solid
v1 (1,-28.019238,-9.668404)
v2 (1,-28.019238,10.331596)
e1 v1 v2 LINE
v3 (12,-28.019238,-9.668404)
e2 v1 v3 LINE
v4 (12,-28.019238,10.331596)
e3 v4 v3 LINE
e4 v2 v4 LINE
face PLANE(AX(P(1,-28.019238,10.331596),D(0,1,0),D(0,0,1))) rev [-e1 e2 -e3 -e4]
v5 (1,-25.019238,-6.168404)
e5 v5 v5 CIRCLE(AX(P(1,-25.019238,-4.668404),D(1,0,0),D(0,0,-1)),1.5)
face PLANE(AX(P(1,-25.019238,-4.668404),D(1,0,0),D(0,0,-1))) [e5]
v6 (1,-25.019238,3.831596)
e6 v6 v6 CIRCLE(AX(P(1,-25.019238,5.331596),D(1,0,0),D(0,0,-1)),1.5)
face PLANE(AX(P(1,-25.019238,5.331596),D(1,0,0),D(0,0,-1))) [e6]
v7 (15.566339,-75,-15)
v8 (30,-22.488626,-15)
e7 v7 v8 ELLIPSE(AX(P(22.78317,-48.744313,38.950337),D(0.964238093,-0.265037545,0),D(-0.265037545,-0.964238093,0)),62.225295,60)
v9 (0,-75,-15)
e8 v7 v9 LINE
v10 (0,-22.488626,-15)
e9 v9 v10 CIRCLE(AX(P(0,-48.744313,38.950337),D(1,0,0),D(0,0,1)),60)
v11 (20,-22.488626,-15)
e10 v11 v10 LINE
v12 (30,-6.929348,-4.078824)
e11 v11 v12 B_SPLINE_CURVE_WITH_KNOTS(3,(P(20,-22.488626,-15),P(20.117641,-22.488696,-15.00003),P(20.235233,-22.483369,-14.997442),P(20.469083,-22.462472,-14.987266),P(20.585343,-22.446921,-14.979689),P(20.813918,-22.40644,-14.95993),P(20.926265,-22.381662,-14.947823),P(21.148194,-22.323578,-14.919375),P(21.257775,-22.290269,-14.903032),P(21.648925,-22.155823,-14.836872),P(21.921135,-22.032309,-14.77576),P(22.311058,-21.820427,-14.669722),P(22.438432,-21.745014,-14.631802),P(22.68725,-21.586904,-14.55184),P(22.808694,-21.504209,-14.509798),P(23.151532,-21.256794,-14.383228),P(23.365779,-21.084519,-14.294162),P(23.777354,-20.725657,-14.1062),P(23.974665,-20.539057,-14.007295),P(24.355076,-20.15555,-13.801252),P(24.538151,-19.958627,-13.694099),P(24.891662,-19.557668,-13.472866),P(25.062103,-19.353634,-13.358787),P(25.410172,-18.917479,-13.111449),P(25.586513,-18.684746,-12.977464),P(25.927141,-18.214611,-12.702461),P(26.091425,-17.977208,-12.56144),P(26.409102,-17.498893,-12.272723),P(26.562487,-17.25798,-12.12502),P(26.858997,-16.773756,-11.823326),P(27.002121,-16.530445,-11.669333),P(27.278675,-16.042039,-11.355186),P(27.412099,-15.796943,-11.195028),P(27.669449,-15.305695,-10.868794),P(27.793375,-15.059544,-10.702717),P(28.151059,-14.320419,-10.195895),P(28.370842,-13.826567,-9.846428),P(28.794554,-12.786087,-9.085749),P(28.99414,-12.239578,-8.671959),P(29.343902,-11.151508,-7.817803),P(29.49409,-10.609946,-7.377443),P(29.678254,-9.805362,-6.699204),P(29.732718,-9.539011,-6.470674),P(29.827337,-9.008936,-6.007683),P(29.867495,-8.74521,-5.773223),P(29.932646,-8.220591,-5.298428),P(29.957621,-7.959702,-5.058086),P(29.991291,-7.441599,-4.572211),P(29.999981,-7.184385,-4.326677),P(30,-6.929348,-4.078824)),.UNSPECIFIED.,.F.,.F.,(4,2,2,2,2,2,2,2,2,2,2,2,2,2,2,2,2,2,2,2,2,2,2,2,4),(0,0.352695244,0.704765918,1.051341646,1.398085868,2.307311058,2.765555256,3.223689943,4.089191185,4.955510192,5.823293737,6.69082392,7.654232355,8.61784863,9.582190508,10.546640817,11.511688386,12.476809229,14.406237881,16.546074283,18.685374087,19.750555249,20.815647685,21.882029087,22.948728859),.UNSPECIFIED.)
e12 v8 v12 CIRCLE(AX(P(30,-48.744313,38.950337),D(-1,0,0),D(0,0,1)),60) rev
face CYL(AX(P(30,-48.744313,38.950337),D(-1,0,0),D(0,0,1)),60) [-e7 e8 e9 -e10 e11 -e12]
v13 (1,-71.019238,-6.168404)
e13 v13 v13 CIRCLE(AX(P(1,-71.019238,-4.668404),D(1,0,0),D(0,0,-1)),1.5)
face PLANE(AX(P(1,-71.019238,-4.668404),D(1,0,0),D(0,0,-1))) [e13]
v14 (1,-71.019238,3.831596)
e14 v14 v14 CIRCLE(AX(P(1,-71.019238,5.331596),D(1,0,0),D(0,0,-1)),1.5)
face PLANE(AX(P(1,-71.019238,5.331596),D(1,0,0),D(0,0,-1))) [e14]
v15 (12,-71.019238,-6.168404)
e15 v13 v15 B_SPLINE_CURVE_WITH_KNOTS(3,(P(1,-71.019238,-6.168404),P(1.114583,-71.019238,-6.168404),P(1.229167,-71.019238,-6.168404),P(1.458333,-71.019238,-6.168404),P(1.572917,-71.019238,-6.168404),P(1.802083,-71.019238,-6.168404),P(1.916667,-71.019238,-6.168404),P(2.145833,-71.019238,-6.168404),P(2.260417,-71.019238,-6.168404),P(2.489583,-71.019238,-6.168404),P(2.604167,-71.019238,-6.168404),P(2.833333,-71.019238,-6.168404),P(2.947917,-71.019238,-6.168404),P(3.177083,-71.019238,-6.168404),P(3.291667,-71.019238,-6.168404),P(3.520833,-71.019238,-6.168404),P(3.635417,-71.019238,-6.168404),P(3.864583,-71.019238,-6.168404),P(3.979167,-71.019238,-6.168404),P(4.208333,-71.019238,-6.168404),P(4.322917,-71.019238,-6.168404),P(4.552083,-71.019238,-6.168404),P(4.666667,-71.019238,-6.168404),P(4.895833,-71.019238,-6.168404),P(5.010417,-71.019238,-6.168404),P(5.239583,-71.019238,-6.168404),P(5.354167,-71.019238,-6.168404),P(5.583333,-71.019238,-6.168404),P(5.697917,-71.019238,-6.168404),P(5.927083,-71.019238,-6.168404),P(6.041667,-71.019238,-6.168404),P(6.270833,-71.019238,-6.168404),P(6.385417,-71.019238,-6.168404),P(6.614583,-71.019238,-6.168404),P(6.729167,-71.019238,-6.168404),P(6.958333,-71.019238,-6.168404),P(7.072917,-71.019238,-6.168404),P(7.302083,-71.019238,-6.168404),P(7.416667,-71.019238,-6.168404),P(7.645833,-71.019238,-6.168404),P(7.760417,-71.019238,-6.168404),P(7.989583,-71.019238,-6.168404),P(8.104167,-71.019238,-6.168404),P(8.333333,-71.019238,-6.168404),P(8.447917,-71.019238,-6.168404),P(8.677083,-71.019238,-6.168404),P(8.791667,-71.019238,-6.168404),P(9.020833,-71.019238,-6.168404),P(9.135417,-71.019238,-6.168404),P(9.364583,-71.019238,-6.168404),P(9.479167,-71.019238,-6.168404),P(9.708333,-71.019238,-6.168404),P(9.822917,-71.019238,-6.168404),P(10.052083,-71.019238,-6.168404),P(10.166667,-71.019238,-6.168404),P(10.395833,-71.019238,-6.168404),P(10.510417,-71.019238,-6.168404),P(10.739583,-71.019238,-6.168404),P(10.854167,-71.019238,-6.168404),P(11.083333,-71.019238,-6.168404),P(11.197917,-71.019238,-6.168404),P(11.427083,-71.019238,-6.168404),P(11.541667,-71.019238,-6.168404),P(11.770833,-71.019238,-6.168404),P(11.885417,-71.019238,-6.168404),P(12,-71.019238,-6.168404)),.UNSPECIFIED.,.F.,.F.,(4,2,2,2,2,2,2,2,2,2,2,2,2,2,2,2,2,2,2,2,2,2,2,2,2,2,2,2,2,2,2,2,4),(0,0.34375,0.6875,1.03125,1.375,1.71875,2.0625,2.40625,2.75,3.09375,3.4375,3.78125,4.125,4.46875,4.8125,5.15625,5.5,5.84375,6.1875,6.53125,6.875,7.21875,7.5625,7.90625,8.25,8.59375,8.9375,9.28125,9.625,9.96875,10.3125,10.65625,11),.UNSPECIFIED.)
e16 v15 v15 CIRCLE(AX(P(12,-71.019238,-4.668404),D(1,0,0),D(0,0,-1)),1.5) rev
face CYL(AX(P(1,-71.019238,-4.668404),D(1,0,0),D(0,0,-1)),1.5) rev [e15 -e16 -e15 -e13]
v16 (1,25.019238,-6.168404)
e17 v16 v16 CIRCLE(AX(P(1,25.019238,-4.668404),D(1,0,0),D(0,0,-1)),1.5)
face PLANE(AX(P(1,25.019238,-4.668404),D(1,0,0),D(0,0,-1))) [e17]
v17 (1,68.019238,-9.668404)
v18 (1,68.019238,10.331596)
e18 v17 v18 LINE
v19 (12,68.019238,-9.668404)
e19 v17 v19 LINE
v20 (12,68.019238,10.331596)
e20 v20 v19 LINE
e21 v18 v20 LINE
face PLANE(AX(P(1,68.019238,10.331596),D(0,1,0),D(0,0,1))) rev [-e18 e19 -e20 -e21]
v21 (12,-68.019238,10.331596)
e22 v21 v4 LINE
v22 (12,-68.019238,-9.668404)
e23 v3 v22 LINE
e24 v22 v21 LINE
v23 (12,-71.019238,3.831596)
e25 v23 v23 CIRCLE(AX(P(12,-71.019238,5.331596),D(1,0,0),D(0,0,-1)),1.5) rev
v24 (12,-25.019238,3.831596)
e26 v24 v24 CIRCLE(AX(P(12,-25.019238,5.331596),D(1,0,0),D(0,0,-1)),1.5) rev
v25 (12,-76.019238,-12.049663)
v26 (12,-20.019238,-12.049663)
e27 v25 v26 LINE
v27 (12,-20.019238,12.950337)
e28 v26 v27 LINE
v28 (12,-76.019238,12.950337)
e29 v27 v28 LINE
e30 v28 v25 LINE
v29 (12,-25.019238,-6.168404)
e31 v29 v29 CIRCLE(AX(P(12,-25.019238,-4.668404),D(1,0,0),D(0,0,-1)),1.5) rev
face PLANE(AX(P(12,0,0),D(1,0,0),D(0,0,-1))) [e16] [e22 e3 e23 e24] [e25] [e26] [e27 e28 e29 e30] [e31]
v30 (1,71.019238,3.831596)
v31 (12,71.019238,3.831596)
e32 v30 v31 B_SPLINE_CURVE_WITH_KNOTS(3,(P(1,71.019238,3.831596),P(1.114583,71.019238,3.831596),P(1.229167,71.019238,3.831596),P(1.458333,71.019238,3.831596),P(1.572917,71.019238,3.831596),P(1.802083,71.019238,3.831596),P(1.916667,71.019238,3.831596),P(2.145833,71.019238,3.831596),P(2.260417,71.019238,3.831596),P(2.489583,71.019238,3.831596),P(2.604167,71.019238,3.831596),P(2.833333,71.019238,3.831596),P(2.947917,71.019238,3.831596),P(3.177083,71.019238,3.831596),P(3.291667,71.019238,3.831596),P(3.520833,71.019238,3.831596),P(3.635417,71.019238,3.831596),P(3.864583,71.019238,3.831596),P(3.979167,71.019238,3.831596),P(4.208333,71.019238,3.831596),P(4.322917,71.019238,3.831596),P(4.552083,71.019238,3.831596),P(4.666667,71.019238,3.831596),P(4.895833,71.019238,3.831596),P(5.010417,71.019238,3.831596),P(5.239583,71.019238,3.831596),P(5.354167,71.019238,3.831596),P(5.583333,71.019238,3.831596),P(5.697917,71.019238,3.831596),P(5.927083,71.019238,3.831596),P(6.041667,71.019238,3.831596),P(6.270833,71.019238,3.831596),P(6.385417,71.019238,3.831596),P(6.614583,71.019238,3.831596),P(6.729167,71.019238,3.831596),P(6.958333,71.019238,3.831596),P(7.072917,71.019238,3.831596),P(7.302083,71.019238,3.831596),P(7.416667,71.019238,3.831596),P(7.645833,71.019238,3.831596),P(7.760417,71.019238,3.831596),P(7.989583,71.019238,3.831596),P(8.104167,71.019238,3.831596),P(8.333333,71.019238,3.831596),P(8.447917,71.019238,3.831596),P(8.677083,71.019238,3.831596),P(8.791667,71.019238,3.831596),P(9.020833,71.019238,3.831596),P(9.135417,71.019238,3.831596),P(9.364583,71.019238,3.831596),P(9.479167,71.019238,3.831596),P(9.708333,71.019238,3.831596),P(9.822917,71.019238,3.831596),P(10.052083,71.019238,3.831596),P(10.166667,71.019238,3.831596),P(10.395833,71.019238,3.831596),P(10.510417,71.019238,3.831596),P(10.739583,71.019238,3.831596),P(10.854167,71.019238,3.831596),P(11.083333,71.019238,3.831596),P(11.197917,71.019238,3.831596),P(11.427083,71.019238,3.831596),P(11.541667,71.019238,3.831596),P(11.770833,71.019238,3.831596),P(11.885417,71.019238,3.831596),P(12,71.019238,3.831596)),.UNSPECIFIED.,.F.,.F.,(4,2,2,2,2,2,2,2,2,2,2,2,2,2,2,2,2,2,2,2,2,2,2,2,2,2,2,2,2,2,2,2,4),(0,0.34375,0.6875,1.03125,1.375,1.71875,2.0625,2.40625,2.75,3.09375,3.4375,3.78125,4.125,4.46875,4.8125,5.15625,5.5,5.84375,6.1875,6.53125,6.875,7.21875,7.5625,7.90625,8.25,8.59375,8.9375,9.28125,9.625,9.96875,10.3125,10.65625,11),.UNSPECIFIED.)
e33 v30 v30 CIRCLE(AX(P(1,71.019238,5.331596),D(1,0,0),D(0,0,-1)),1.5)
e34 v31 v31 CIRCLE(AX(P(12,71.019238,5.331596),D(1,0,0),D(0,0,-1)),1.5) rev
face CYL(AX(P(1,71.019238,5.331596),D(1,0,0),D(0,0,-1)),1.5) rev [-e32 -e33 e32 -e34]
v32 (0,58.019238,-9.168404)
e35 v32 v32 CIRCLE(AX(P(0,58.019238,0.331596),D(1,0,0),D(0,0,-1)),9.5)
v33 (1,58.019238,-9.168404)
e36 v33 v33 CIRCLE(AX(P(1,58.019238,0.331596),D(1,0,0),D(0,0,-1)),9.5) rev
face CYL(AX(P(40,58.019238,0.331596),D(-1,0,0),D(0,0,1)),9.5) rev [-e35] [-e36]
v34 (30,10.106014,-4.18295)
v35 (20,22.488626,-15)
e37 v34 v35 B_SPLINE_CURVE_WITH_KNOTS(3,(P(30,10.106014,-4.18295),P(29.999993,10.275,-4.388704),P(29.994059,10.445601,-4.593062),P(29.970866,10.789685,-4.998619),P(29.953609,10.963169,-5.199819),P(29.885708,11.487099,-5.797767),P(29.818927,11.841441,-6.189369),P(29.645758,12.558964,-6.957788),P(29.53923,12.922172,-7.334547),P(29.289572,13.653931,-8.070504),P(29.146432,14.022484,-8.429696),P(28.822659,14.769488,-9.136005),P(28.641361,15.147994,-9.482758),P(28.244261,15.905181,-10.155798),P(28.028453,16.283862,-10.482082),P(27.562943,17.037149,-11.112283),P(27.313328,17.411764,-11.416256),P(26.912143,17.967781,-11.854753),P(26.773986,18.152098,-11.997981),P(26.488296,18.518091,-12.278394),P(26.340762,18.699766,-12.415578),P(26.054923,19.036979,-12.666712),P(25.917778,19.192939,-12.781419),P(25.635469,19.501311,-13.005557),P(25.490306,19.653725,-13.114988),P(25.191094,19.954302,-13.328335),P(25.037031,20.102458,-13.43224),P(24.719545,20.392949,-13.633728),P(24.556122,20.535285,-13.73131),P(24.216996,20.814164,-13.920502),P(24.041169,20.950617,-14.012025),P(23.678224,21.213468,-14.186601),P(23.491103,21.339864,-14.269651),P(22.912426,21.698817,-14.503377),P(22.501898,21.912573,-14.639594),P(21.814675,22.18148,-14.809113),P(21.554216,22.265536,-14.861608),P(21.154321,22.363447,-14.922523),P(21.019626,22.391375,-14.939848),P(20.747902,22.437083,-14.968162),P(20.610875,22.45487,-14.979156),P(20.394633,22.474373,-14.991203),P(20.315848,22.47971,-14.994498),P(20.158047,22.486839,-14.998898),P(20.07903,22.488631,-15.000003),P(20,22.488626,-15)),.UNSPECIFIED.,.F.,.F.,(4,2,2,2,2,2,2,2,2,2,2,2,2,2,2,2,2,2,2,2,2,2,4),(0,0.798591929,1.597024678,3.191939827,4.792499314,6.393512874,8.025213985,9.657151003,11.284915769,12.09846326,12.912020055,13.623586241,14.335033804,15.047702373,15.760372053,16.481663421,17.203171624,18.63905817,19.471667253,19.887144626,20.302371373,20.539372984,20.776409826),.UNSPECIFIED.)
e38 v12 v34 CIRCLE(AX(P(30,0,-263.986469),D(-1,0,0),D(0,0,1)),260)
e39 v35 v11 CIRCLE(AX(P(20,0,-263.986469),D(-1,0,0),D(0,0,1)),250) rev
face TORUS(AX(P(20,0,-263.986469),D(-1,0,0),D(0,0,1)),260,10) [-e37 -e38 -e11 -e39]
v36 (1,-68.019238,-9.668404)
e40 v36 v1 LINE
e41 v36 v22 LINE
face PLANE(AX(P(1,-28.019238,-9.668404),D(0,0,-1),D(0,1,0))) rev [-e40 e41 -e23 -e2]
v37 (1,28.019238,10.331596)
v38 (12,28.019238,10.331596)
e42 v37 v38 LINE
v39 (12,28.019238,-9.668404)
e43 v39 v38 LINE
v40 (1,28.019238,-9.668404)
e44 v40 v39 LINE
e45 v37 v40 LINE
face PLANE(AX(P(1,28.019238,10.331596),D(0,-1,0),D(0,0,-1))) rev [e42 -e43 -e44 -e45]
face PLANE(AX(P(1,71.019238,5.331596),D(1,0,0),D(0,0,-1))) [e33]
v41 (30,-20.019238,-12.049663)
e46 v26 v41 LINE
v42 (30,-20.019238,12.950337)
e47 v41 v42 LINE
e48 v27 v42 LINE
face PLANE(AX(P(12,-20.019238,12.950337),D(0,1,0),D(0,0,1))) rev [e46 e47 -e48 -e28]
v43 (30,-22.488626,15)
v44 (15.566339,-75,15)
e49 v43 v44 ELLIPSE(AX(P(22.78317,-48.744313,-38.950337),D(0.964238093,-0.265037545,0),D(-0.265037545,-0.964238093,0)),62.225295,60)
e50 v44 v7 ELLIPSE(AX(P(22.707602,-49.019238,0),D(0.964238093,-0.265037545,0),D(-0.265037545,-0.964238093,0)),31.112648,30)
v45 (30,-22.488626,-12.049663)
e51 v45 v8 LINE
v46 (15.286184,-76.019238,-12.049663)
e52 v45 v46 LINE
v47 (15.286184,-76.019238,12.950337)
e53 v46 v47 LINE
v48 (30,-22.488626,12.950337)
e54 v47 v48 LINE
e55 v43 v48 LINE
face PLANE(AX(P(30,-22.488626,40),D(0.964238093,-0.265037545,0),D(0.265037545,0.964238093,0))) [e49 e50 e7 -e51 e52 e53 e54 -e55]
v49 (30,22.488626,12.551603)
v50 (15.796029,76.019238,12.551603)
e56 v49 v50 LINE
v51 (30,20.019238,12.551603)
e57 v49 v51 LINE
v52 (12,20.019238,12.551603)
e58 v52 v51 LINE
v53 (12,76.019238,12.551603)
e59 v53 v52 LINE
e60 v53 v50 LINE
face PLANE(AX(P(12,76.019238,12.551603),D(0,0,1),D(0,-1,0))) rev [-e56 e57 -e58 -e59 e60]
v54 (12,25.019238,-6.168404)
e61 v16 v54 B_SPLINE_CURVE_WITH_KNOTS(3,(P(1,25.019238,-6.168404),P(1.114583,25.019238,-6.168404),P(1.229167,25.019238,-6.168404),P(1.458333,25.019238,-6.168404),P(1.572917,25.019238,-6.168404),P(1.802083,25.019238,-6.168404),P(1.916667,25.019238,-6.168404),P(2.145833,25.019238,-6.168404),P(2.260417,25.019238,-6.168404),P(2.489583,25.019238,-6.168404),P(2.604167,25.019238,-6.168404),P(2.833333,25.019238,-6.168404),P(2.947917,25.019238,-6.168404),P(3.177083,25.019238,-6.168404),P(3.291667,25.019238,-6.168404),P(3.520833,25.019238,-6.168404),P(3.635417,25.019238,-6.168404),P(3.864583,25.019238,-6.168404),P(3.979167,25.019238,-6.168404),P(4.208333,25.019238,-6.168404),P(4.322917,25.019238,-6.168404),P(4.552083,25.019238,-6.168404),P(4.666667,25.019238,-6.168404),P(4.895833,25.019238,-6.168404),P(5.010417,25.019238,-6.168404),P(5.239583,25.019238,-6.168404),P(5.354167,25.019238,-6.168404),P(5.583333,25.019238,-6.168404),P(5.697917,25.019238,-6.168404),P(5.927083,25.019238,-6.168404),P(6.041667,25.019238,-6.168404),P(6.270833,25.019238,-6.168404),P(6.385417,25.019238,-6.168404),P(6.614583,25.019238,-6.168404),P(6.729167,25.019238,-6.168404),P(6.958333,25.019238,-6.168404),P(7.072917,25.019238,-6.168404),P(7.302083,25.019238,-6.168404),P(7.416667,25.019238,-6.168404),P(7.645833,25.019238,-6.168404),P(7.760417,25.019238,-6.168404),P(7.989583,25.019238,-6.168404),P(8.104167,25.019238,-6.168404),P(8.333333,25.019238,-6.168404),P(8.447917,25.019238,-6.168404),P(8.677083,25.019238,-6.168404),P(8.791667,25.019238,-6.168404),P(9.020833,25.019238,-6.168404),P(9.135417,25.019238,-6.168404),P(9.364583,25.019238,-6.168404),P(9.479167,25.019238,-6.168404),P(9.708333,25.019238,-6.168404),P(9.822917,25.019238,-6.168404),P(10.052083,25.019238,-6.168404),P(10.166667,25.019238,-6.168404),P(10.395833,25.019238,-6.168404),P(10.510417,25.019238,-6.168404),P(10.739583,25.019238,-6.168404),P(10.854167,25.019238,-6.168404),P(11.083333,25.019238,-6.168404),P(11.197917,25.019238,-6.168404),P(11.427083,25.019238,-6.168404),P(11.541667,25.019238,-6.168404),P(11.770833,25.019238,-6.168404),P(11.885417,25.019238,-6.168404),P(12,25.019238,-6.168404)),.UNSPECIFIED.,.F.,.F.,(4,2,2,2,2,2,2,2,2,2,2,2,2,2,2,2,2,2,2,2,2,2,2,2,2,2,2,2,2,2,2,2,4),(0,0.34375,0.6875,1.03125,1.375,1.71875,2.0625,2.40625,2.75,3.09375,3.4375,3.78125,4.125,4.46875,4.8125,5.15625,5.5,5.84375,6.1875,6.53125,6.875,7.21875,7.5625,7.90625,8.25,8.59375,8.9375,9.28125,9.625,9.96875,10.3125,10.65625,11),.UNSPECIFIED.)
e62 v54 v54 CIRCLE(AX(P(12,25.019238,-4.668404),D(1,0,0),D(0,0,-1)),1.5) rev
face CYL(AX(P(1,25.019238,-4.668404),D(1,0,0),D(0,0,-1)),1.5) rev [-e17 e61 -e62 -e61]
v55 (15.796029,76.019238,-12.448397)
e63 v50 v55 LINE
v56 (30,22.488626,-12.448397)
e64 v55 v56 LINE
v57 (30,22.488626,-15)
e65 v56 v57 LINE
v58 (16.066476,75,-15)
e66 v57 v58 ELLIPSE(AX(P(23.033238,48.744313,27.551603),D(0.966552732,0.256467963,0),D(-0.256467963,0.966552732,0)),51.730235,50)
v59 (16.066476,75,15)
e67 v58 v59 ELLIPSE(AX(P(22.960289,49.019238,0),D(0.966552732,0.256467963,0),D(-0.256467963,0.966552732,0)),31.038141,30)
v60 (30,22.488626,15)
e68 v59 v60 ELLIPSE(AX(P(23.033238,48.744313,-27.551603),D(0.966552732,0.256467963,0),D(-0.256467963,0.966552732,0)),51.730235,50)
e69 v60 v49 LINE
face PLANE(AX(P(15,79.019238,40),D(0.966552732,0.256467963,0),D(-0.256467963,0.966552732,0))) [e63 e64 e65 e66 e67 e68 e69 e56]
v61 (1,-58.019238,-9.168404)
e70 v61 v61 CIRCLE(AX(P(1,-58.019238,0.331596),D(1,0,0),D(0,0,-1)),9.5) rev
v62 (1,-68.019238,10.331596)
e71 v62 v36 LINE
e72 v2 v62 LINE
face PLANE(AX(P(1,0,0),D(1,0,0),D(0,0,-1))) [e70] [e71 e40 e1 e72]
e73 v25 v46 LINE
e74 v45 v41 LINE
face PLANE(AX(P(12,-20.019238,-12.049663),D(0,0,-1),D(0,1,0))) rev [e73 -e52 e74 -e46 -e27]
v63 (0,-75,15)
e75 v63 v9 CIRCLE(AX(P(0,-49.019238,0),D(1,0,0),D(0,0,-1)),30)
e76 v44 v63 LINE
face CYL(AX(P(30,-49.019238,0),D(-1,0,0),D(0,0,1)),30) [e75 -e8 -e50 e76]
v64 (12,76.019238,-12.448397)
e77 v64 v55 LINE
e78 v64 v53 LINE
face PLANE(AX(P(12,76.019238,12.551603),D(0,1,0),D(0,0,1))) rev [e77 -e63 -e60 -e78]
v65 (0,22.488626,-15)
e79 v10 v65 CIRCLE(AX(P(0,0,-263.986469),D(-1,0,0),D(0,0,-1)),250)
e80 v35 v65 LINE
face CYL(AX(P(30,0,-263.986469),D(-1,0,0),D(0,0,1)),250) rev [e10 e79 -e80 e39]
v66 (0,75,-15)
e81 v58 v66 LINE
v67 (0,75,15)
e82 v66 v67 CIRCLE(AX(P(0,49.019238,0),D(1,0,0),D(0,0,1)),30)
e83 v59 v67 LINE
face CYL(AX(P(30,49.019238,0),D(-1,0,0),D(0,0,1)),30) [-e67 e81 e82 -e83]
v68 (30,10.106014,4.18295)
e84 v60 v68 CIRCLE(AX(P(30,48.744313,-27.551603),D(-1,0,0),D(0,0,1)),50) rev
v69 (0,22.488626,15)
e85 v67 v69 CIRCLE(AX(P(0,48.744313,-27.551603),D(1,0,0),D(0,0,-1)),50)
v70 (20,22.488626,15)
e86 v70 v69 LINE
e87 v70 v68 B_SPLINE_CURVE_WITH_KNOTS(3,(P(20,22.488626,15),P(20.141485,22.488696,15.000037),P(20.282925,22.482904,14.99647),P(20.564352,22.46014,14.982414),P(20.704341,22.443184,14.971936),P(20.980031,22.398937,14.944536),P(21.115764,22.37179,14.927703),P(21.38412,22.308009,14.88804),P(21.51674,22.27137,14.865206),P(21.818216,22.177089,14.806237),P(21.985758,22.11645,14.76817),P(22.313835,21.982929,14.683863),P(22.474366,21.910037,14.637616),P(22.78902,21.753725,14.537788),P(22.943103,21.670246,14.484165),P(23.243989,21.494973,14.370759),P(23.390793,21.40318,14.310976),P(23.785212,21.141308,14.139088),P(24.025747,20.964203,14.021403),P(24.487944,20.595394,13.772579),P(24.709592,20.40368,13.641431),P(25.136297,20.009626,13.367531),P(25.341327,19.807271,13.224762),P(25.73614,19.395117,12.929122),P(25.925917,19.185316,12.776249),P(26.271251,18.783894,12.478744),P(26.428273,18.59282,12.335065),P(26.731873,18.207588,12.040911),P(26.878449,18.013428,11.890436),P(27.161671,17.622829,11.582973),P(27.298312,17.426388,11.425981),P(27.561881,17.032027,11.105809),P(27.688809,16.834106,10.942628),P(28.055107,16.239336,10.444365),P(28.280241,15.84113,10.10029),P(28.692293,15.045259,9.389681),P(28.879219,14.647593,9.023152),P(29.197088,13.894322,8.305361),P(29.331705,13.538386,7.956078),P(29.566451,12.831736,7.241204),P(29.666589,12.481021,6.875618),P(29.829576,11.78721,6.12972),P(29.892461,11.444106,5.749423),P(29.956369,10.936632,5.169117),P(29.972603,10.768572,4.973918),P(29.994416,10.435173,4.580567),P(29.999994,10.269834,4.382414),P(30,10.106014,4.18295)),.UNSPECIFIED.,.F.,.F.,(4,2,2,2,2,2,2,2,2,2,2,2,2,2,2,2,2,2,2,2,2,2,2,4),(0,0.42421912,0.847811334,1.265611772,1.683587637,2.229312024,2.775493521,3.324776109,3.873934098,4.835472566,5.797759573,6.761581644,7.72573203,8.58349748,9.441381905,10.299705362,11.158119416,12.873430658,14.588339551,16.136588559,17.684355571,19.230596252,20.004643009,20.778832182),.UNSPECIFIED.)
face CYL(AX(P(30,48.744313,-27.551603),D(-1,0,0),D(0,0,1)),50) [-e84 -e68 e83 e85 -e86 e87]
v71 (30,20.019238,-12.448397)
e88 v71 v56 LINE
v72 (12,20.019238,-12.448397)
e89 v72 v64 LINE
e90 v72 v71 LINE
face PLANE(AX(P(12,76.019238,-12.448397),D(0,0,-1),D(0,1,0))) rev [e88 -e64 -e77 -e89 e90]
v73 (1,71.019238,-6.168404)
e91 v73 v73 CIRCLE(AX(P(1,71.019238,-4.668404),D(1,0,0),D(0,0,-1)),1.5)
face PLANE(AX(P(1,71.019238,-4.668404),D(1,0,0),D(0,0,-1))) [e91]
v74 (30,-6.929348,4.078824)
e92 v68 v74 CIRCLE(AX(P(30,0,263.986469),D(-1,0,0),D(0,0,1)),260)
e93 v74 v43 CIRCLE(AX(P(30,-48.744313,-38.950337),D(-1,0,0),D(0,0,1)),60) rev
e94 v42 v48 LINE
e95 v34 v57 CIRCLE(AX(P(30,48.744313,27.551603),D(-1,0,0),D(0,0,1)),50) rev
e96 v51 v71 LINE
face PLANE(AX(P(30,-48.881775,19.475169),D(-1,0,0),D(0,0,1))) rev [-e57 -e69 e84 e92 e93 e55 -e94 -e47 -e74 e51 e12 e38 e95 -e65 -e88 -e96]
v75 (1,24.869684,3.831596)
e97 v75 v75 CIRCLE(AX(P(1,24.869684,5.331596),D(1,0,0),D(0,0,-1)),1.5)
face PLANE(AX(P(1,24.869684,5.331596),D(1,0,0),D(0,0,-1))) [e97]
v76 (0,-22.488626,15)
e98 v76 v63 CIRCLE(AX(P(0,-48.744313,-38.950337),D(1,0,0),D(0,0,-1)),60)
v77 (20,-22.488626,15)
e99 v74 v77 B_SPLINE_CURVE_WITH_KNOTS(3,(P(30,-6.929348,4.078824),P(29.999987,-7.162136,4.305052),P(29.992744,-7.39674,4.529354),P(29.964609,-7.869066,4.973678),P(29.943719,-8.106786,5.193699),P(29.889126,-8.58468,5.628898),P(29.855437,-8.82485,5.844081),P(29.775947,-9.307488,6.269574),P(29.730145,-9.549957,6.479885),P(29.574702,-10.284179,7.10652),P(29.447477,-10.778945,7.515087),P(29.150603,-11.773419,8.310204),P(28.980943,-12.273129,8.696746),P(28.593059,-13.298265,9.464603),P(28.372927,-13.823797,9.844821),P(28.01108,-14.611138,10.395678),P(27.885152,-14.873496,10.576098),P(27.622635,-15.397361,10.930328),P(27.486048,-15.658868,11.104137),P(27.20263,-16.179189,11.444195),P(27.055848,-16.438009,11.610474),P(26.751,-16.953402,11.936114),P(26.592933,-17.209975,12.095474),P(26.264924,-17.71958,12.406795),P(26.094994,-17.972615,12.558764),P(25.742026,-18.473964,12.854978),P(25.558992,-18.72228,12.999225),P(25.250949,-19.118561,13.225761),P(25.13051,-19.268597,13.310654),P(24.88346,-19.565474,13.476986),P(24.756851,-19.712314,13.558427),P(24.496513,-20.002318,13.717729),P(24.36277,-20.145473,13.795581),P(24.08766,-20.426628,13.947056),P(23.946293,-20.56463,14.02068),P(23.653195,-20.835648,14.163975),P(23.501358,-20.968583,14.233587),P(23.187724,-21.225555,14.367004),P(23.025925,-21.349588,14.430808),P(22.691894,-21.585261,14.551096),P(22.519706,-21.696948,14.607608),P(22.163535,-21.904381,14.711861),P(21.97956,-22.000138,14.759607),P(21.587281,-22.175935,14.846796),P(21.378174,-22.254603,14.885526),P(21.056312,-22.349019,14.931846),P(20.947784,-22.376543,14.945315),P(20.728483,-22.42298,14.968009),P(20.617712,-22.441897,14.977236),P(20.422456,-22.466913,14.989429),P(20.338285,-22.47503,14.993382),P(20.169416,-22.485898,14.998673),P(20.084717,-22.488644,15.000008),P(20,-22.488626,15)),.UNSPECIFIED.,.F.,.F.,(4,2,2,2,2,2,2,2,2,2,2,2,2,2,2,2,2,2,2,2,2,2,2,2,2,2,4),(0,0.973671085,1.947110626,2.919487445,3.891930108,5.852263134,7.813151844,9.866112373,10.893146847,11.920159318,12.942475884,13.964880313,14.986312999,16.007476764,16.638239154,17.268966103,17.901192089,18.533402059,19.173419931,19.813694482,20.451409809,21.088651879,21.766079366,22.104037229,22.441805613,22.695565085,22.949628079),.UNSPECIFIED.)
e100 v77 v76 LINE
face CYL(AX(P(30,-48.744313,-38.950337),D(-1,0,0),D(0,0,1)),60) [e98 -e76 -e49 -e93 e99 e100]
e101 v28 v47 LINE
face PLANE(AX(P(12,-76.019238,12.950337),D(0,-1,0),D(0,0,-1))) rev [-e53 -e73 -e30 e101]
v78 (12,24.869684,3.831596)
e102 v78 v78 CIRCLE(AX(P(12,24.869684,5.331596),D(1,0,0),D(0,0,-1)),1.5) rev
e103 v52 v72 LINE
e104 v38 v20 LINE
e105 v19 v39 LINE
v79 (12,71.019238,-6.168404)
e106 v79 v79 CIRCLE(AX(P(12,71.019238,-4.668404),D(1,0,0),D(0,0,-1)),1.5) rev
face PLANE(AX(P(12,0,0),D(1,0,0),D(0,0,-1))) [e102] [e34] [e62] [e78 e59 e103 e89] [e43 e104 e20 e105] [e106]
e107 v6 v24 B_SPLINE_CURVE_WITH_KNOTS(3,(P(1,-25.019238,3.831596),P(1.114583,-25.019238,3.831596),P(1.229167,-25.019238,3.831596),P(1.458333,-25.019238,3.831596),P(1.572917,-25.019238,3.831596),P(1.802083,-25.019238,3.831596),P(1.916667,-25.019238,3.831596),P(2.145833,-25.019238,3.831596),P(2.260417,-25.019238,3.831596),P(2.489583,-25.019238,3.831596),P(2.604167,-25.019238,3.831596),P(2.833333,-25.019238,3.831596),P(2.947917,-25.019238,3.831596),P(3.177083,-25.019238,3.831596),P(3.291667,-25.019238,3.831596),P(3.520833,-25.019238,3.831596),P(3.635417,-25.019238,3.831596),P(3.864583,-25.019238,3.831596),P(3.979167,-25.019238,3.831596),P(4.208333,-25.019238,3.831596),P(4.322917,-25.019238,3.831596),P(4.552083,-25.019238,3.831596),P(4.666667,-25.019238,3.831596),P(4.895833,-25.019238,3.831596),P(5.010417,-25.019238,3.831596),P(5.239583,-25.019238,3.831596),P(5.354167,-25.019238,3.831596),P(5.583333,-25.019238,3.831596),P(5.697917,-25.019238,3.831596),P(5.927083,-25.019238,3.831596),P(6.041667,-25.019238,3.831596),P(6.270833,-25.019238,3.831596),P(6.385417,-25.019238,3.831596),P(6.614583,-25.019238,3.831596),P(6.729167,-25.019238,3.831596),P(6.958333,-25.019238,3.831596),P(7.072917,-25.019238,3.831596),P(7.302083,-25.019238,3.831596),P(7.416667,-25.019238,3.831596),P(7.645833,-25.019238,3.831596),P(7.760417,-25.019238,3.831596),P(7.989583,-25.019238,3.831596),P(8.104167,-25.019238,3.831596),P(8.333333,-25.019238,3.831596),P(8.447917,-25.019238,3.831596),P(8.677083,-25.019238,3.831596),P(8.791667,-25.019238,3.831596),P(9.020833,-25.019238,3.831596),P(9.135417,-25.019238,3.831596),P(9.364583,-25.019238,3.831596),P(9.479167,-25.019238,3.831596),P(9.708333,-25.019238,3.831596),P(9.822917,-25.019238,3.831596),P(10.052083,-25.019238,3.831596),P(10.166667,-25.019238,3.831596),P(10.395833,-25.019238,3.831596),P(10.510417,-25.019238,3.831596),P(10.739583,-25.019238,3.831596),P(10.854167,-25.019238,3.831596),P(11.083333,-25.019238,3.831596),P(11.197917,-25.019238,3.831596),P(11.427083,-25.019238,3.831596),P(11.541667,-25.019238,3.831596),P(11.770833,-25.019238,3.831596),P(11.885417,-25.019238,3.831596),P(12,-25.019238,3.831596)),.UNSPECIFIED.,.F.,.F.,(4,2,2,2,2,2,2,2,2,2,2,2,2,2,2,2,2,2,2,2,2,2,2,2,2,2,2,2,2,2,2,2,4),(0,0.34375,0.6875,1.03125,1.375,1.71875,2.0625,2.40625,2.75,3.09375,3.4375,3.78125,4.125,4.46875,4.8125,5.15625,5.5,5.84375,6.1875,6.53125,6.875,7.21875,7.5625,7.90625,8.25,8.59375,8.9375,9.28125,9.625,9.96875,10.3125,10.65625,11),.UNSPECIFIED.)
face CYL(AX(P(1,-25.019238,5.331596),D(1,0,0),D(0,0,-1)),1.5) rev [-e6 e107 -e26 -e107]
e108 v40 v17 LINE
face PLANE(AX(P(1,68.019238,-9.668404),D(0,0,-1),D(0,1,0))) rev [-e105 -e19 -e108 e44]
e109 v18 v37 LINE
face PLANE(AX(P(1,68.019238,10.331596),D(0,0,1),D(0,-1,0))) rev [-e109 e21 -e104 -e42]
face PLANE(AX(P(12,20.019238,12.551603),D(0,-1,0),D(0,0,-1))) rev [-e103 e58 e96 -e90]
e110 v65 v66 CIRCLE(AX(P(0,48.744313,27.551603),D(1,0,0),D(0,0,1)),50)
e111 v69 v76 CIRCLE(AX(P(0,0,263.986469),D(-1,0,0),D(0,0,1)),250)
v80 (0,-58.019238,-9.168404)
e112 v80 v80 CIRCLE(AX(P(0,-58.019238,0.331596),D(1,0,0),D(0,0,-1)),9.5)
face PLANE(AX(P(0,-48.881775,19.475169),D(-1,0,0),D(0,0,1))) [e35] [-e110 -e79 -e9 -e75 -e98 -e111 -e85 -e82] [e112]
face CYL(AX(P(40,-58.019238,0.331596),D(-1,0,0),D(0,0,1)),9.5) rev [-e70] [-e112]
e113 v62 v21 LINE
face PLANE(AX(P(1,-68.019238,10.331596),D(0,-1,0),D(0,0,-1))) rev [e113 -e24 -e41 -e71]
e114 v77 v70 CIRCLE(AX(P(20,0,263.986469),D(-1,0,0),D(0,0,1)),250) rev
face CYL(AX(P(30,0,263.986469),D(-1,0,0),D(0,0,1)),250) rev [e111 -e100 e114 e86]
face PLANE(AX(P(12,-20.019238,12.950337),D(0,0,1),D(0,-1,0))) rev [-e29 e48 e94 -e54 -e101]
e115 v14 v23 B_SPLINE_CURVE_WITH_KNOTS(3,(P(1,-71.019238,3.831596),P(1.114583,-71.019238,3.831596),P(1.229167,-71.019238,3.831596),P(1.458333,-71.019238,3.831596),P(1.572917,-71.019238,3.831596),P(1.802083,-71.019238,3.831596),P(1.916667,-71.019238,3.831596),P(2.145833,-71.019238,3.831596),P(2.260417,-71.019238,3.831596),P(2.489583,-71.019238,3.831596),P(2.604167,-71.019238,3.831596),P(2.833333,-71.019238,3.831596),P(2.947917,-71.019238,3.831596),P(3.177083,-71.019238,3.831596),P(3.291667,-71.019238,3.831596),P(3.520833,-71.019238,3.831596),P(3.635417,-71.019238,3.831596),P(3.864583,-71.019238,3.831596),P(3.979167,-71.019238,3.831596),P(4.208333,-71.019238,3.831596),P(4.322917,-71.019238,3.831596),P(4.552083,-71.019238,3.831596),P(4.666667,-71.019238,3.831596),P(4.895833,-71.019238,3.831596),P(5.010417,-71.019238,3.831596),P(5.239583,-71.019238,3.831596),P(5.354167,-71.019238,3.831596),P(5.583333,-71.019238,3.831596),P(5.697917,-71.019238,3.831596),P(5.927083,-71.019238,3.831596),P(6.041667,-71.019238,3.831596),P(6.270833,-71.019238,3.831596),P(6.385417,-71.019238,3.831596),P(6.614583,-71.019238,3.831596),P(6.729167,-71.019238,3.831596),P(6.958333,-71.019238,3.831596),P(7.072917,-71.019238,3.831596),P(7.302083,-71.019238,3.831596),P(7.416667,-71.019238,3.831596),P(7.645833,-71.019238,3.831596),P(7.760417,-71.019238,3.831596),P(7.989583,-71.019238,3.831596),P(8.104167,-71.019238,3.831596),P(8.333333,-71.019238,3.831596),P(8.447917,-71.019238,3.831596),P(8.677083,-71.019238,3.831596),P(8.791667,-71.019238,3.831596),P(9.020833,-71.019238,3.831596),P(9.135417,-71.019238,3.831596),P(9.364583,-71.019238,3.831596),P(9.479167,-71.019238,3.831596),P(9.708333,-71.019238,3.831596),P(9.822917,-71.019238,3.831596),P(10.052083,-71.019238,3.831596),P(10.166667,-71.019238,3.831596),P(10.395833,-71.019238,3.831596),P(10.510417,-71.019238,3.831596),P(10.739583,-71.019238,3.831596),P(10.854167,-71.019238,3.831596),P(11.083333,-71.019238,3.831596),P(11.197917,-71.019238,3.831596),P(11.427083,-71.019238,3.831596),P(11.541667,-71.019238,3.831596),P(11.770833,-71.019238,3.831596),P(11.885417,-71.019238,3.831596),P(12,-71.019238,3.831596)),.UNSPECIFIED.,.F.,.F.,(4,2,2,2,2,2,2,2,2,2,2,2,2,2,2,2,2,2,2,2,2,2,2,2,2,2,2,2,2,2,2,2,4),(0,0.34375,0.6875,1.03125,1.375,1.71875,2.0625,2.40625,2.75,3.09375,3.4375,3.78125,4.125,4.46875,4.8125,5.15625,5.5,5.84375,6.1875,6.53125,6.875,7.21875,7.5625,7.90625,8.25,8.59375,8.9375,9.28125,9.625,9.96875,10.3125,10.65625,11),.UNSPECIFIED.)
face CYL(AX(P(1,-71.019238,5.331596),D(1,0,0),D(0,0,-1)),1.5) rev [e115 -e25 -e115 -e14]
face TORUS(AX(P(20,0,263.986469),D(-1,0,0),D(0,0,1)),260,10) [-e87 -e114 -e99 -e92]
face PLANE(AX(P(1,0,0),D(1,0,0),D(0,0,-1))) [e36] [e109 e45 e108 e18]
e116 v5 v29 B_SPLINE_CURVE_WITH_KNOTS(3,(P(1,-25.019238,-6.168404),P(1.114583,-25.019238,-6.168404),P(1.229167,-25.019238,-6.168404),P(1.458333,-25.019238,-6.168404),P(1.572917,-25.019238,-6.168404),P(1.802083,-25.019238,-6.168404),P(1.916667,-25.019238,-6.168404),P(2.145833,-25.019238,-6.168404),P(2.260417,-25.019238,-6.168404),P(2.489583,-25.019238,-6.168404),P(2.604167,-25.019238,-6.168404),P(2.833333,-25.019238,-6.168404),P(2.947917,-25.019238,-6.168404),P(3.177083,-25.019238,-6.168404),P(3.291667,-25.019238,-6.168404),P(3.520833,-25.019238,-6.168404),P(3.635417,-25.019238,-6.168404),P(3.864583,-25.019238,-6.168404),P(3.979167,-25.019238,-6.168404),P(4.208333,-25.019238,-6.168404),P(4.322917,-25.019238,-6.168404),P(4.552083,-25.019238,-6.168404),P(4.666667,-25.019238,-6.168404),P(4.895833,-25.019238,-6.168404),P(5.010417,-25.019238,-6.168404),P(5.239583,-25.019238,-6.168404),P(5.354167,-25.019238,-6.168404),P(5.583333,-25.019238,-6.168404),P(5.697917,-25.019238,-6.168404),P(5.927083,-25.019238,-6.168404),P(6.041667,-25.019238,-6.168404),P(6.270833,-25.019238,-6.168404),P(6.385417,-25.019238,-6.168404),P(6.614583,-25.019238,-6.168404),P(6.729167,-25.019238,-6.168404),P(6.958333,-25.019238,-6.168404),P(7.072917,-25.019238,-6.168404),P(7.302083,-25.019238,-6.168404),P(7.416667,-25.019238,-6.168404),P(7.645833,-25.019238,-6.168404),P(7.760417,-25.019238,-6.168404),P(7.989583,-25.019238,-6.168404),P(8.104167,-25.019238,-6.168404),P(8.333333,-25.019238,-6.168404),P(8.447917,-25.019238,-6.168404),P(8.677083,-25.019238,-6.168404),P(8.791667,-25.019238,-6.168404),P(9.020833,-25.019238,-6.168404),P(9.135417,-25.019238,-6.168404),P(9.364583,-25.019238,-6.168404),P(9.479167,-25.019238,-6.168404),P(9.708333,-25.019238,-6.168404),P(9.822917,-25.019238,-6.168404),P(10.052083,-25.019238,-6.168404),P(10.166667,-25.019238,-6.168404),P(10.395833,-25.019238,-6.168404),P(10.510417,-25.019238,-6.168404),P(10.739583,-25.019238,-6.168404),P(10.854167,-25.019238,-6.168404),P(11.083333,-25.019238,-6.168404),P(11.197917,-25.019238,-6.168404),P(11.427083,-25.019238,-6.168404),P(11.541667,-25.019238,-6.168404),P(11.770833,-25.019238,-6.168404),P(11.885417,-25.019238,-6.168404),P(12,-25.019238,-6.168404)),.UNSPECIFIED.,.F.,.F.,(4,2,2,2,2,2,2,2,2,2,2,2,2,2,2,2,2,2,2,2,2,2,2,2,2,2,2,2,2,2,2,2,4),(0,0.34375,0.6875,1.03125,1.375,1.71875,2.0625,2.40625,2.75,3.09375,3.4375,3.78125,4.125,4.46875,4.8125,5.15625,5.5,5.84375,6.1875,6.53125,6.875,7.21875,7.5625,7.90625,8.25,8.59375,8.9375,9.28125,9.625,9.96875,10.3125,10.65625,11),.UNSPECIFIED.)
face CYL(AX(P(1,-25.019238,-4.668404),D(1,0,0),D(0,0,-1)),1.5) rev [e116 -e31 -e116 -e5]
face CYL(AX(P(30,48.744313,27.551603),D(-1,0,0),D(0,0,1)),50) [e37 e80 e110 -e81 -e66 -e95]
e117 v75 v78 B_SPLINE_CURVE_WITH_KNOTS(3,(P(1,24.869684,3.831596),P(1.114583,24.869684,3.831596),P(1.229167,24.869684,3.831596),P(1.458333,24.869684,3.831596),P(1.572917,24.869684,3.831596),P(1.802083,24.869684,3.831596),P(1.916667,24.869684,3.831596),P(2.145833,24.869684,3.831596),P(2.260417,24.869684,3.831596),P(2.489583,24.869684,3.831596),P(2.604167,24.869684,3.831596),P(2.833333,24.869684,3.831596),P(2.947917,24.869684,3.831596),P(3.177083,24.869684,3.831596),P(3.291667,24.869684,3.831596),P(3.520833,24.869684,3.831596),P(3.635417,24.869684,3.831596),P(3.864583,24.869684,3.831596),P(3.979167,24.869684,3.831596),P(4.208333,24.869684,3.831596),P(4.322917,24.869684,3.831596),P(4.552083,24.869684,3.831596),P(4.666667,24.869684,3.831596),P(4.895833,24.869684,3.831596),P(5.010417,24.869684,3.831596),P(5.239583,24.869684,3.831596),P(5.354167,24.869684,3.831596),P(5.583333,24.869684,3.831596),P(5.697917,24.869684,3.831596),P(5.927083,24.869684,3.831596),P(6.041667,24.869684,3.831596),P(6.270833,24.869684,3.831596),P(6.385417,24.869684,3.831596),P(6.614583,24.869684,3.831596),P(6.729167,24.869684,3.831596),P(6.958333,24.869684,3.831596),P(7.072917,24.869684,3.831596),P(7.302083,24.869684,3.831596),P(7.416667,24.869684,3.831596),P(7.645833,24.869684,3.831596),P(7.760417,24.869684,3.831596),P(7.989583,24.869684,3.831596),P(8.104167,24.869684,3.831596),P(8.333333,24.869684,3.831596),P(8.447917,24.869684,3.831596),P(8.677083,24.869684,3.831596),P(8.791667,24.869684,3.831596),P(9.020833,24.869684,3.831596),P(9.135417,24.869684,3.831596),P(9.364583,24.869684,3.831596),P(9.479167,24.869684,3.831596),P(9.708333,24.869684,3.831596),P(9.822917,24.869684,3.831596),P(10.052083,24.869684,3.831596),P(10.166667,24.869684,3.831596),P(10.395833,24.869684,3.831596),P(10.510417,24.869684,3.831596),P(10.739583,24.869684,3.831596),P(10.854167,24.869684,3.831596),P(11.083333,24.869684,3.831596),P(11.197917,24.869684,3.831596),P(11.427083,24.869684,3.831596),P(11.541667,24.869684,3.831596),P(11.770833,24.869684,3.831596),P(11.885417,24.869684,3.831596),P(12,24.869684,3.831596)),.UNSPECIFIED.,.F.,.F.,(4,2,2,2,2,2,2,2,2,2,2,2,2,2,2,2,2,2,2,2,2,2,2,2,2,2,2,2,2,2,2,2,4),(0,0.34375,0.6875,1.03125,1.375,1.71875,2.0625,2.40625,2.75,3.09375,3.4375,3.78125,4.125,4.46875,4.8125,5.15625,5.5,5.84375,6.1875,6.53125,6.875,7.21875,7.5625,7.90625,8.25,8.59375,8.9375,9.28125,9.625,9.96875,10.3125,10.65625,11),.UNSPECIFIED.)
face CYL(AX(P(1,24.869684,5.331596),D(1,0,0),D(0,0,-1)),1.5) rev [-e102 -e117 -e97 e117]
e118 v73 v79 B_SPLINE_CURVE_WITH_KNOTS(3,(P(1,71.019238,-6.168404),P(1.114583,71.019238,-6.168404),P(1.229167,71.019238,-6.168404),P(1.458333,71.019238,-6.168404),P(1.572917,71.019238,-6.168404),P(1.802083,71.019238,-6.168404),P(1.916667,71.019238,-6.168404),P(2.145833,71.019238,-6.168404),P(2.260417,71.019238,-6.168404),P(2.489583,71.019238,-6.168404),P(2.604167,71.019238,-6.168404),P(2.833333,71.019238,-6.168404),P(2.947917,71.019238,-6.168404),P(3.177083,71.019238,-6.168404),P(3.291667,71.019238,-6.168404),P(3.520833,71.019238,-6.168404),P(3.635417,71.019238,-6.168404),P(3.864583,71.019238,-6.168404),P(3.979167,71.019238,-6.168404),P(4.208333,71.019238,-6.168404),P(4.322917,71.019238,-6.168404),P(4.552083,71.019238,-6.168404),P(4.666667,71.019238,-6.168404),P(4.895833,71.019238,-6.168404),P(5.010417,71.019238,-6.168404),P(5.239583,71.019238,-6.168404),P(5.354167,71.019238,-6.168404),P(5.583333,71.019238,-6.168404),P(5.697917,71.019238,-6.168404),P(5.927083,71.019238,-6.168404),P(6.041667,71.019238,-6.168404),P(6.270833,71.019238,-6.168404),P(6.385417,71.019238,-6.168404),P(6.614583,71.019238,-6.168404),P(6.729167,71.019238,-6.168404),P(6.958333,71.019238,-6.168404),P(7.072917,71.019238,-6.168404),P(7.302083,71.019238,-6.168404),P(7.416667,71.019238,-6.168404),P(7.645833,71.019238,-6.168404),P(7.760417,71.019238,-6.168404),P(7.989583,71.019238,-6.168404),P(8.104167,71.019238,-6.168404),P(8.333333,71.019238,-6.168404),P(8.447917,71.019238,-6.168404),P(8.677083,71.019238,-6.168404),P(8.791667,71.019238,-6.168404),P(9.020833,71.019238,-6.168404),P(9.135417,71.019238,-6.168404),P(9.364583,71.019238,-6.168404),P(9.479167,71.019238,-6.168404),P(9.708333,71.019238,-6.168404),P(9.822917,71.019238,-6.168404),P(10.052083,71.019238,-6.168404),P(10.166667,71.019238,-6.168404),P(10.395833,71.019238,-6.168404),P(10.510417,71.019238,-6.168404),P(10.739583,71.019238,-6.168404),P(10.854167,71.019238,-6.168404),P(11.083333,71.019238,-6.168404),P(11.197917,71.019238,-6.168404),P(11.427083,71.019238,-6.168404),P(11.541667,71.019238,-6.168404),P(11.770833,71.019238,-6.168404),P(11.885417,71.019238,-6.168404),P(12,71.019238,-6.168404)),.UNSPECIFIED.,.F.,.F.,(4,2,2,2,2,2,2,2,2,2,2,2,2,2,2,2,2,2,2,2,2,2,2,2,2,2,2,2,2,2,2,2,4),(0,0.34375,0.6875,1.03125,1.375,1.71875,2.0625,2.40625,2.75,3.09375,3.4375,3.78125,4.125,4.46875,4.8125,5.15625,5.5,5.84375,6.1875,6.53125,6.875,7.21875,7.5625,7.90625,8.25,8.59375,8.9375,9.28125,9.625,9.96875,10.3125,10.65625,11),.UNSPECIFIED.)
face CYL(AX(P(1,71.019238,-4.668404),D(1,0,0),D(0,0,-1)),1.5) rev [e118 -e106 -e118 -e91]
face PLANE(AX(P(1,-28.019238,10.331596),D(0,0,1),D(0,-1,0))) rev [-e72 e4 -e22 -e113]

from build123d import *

# Parameters (mm, degrees)
BOSS_EXTRUDE1_DEPTH     = 30
SKETCH2_R               = 1.5000000000000049
SKETCH2_R_2             = 1.500000000000013
SKETCH2_R_3             = 1.5000000000000009
SKETCH2_R_4             = 1.5000000000000004
CUT_EXTRUDE1_DEPTH      = 29
CUT_EXTRUDE2_DEPTH      = 18
CUT_EXTRUDE3_DEPTH      = 40
CUT_EXTRUDE3_DEPTH_BACK = 40
SKETCH5_R               = 9.5
CUT_EXTRUDE4_DEPTH      = 40
FILLET1_R               = 10
FILLET2_R               = 10


with BuildPart() as part:
    # Sketch1 → Boss-Extrude1 (new body)
    with BuildSketch(Plane(origin=(0, 0, 0), x_dir=(0, 0, -1), z_dir=(1, 0, 0))):
        with BuildLine():
            ThreePointArc((14.999999999999988, 22.48862564156887), (13.986468943100135, -3.598e-14), (15, -22.488625641568866))
            ThreePointArc((15, -22.488625641568866), (21.049662737410323, -48.744312820784444), (15.000000000000004, -75.00000000000001))
            ThreePointArc((15.000000000000004, -75.00000000000001), (4.72e-15, -79.01923788646685), (-14.999999999999996, -75.00000000000001))
            ThreePointArc((-14.999999999999996, -75.00000000000001), (-21.049662737410294, -48.74431282078444), (-15.00000000000001, -22.488625641568866))
            ThreePointArc((-15.00000000000001, -22.488625641568866), (-13.986468943100135, 1.189e-14), (-15.00000000000001, 22.488625641568895))
            ThreePointArc((-15.00000000000001, 22.488625641568895), (-22.448397318700515, 48.74431282078445), (-15.000000000000007, 74.99999999999999))
            ThreePointArc((-15.000000000000007, 74.99999999999999), (-1.35e-15, 79.01923788646687), (14.99999999999999, 74.99999999999999))
            ThreePointArc((14.99999999999999, 74.99999999999999), (22.448397318700543, 48.744312820784415), (14.999999999999988, 22.48862564156887))
        make_face()
    extrude(amount=BOSS_EXTRUDE1_DEPTH)

    # Sketch2 → Cut-Extrude1 (cut)
    with BuildSketch(Plane(origin=(30, 0, 0), x_dir=(0, 0, -1), z_dir=(1, 0, 0))):
        with Locations((4.6684040574518, 71.01923788646675)):
            Circle(SKETCH2_R)
        with Locations((-5.331595942548199, 71.01923788646673)):
            Circle(SKETCH2_R_2)
        with Locations((4.6684040574518, 25.01923788646677)):
            Circle(SKETCH2_R_3)
        with Locations((-5.331595942548199, 24.86968442746252)):
            Circle(SKETCH2_R_4)
        with Locations((4.6684040574518, -25.019237886466854)):
            Circle(SKETCH2_R_3)
        with Locations((-5.331595942548199, -25.01923788646685)):
            Circle(SKETCH2_R_3)
        with Locations((4.6684040574518, -71.01923788646685)):
            Circle(SKETCH2_R_3)
        with Locations((-5.331595942548199, -71.01923788646685)):
            Circle(SKETCH2_R_3)
        Polygon((-10.3315959425482, 68.01923788646677), (9.6684040574518, 68.01923788646677), (9.668404057451806, 28.01923788646677), (-10.331595942548194, 28.019237886466765), align=None)
        Polygon((-10.331595942548196, -28.019237886466858), (9.668404057451804, -28.019237886466854), (9.66840405745181, -68.01923788646685), (-10.33159594254819, -68.01923788646685), align=None)
    extrude(amount=-CUT_EXTRUDE1_DEPTH, mode=Mode.SUBTRACT)

    # Sketch3 → Cut-Extrude2 (cut)
    with BuildSketch(Plane(origin=(30, 0, 0), x_dir=(0, 0, -1), z_dir=(1, 0, 0))):
        Polygon((-12.551602681299467, 76.01923788646684), (12.44839731870053, 76.01923788646684), (12.448397318700541, 20.019237886466833), (-12.55160268129946, 20.019237886466833), align=None)
        Polygon((-12.950337262589732, -20.01923788646686), (12.04966273741027, -20.01923788646686), (12.049662737410275, -76.01923788646687), (-12.950337262589725, -76.01923788646687), align=None)
    extrude(amount=-CUT_EXTRUDE2_DEPTH, mode=Mode.SUBTRACT)

    # Sketch4 → Cut-Extrude3 (cut, two sides: drawn at the far end of the back side and taken through both)
    with BuildSketch(Plane.XY.offset(-CUT_EXTRUDE3_DEPTH_BACK)):
        Polygon((15, 79.01923788646681), (30, 22.48862564156887), (30, -22.488625641568873), (14.279552603766648, -79.68148202341017), (43.09744845310124, -79.68148202341017), (43.09744845310124, 80.44995924605905), align=None)
    extrude(amount=CUT_EXTRUDE3_DEPTH + CUT_EXTRUDE3_DEPTH_BACK, mode=Mode.SUBTRACT)

    # Sketch5 → Cut-Extrude4 (cut)
    with BuildSketch(Plane(origin=(0, 0, 0), x_dir=(0, 0, -1), z_dir=(1, 0, 0))):
        with Locations((-0.33159594254819796, 58.01923788646677)):
            Circle(SKETCH5_R)
        with Locations((-0.331595942548191, -58.019237886466854)):
            Circle(SKETCH5_R)
    extrude(amount=CUT_EXTRUDE4_DEPTH, mode=Mode.SUBTRACT)

    # Fillet1
    # the kernel refuses this fillet: 10 mm, written as the material it takes off along each edge
    with BuildSketch(Plane(origin=(30, 7.017e-14, -263.9864689431014), x_dir=(0, 0.1889343030386976, 0.9819897296485751), z_dir=(0, 0.9819897296485751, -0.1889343030386976))) as fillet1_piece_1_section:
        with BuildLine():
            CenterArc((250.00000000000125 + FILLET1_R, -FILLET1_R), FILLET1_R, 90, 90)
            Line((250.00000000000125 + FILLET1_R, 0), (250.00000000000125, 0))
            Line((250.00000000000125, 0), (250.00000000000125, -FILLET1_R))
        make_face()
    fillet1_piece_1 = revolve(axis=Axis((30, 7.017e-14, -263.9864689431014), (1, 0, 0)), revolution_arc=21.781195760755132, mode=Mode.PRIVATE)
    fillet1_piece_1 = fillet1_piece_1 - Plane(origin=(27.494567227966037, 48.74431282078443, 27.551602681299116), x_dir=(0, 0.5251137435843147, -0.851032053625988), z_dir=(-1, 0, 0)) * Cylinder(49.99999999999966, 1041, mode=Mode.PRIVATE)
    fillet1_piece_1 = fillet1_piece_1 - Plane(origin=(27.494567227966037, -48.744312820784444, 38.95033726258946), x_dir=(0, 0.4375947863202612, -0.8991722877098276), z_dir=(-1, 0, 0)) * Cylinder(59.99999999999978, 1041, mode=Mode.PRIVATE)
    add(fillet1_piece_1, mode=Mode.SUBTRACT)

    # Fillet2
    fillet2_edges = [part.edges().sort_by_distance(p)[0] for p in [
        (30, 1.066e-14, 13.986468943100135),
    ]]
    fillet(fillet2_edges, radius=FILLET2_R)


solid = part.part
